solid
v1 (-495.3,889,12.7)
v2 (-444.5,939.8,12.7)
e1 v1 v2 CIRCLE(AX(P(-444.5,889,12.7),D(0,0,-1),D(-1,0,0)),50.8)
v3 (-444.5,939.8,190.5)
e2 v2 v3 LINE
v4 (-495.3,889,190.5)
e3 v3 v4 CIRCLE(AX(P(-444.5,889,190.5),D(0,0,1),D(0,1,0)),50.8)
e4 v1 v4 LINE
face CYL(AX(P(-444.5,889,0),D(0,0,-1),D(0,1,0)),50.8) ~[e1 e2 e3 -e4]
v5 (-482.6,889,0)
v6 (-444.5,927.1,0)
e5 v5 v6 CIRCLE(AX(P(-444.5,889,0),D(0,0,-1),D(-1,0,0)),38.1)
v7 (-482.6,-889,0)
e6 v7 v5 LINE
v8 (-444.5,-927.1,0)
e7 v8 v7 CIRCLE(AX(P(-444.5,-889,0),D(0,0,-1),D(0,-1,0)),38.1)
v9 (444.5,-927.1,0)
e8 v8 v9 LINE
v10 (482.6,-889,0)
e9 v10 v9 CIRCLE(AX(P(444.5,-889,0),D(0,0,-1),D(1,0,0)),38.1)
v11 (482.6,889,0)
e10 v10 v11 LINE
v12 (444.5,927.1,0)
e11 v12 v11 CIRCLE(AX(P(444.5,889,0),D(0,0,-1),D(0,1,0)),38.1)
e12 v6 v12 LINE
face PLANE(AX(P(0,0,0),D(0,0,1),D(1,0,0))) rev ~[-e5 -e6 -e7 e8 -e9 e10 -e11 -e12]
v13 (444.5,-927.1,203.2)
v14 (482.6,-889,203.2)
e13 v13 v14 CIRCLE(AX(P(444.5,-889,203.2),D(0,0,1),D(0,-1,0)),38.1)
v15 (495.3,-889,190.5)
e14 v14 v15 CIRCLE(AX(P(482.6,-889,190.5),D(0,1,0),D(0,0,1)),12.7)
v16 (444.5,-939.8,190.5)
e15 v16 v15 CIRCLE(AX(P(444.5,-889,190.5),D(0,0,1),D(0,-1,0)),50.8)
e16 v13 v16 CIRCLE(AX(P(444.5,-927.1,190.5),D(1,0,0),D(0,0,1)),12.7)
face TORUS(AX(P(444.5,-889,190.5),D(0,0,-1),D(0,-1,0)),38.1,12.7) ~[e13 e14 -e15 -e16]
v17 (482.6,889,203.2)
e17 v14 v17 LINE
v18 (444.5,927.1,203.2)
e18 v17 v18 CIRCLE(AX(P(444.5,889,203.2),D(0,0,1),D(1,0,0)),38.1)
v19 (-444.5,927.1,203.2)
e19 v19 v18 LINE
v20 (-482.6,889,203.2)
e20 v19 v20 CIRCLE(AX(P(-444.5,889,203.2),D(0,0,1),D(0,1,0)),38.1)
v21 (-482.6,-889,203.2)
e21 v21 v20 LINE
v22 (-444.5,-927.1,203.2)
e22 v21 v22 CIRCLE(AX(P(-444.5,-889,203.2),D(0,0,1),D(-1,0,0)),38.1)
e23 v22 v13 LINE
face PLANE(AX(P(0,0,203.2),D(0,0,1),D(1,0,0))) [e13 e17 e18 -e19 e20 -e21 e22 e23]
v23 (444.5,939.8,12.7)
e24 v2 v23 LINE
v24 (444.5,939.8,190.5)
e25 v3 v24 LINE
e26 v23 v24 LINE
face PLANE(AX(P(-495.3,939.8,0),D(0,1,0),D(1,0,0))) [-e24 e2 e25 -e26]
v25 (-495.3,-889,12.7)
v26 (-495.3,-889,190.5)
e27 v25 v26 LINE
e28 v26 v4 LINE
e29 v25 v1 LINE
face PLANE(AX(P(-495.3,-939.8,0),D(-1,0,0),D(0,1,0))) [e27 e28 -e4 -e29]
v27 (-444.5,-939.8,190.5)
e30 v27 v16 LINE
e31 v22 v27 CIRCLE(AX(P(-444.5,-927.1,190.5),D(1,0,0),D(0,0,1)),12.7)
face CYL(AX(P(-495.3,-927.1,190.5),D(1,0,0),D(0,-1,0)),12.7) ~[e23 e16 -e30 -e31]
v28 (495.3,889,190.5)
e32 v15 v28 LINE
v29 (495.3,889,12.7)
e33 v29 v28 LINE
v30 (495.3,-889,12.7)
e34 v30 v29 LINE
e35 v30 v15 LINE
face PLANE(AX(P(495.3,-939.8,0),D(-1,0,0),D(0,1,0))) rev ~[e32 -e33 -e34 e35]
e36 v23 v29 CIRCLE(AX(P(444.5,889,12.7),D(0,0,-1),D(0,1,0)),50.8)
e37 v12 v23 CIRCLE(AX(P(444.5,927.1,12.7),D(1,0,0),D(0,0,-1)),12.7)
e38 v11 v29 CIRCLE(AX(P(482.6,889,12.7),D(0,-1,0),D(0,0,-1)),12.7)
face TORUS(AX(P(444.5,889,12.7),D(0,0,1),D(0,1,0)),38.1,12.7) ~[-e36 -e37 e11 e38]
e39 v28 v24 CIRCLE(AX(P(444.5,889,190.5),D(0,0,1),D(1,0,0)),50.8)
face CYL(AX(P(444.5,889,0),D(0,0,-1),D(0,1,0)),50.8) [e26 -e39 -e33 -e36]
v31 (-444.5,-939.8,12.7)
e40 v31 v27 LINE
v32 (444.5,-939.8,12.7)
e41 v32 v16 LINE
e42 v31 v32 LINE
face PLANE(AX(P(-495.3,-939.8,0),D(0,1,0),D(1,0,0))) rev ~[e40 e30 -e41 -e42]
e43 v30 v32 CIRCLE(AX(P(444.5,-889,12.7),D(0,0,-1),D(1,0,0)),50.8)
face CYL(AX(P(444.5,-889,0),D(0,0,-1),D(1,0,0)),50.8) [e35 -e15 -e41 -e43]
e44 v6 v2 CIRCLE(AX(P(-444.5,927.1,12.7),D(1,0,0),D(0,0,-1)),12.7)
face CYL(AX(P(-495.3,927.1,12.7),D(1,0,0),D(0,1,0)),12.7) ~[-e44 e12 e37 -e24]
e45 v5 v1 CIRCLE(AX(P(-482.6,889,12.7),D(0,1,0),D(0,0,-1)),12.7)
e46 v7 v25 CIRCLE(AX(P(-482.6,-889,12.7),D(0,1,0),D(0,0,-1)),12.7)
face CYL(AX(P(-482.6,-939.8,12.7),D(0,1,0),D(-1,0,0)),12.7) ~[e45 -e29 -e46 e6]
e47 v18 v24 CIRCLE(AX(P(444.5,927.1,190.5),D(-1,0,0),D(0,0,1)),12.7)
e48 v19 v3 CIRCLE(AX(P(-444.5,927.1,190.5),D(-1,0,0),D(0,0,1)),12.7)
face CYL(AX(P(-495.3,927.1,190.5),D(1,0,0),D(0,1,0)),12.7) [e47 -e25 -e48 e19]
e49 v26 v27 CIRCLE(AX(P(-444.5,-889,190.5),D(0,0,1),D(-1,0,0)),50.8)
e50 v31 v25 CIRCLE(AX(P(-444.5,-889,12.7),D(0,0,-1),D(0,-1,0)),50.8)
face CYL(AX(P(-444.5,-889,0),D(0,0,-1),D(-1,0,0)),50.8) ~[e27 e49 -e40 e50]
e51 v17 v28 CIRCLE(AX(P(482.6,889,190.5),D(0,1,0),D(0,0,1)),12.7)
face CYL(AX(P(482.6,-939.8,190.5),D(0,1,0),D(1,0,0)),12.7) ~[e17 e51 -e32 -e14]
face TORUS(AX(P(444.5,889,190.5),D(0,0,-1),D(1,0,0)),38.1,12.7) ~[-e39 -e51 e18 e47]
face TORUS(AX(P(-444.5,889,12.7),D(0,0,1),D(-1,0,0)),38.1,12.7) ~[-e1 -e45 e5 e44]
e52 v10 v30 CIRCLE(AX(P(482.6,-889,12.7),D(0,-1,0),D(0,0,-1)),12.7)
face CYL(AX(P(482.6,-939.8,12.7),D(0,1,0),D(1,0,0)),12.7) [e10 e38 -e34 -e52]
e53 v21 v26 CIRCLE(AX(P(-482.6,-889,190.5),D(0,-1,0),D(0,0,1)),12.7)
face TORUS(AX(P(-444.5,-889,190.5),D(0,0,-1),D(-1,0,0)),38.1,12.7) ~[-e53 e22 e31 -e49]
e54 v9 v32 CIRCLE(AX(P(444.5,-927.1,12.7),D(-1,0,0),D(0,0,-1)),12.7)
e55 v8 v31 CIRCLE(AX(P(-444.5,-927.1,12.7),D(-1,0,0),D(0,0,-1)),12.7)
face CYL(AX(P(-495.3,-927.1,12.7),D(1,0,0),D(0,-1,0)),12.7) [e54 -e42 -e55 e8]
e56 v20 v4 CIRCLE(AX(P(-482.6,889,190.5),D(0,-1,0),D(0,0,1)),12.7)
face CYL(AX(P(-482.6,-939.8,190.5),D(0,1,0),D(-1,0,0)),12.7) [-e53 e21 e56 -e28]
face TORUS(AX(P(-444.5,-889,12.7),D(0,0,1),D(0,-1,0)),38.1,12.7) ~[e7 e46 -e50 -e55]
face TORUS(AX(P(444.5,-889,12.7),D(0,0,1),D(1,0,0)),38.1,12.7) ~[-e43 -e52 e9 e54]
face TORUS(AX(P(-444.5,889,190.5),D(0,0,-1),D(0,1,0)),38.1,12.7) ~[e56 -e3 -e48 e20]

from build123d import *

# Parameters (mm, degrees)
F0_W         = 990.6
F0_H         = 1879.6
F1_DEPTH     = 203.2
F2_R         = 12.7
F3_T1_DEPTH  = 203.2
F3_T4_ANGLE  = 90
F3_T6_ANGLE  = 90
F3_T8_ANGLE  = 90
F3_T10_ANGLE = 90
F3_T12_ANGLE = 90
F3_T14_ANGLE = 90
F3_T16_ANGLE = 90
F3_T18_ANGLE = 90


# Not quite as in the source:
# - a fillet or chamfer that OpenCascade refuses, or shapes differently, is made with other operations: its cross-section is extruded or revolved along the edge and cut away or added


with BuildPart() as f1:
    # F0 (on Top) → F1 (new body)
    with BuildSketch(Plane.XY):
        Rectangle(F0_W, F0_H)
    extrude(amount=F1_DEPTH)

    # F2
    f2_edges = [f1.edges().sort_by_distance(p)[0] for p in [
        (-495.3, 0, 203.2),
        (0, -939.8, 203.2),
        (495.3, 0, 203.2),
        (0, 939.8, 203.2),
        (495.3, 0, 0),
        (0, -939.8, 0),
        (-495.3, 0, 0),
        (0, 939.8, 0),
    ]]
    fillet(f2_edges, radius=F2_R)

    # F3: fillet of radius 50.8 on 4 edges, made by hand

    # F3_s2 → F3_t1 (cut)
    with BuildSketch(Plane.XY):
        with BuildLine():
            ThreePointArc((-495.3, -889), (-480.4210244843, -924.9210244843), (-444.5, -939.8))
            Line((-444.5, -939.8), (-444.5, -940.816))
            Line((-444.5, -940.816), (-496.316, -940.816))
            Line((-496.316, -940.816), (-496.316, -889))
            Line((-496.316, -889), (-495.3, -889))
        make_face()
        with BuildLine():
            ThreePointArc((495.3, -889), (480.4210244843, -924.9210244843), (444.5, -939.8))
            Line((444.5, -939.8), (444.5, -940.816))
            Line((444.5, -940.816), (496.316, -940.816))
            Line((496.316, -940.816), (496.316, -889))
            Line((496.316, -889), (495.3, -889))
        make_face()
        with BuildLine():
            ThreePointArc((444.5, 939.8), (480.4210244843, 924.9210244843), (495.3, 889))
            Line((495.3, 889), (496.316, 889))
            Line((496.316, 889), (496.316, 940.816))
            Line((496.316, 940.816), (444.5, 940.816))
            Line((444.5, 940.816), (444.5, 939.8))
        make_face()
        with BuildLine():
            ThreePointArc((-444.5, 939.8), (-480.4210244843, 924.9210244843), (-495.3, 889))
            Line((-495.3, 889), (-496.316, 889))
            Line((-496.316, 889), (-496.316, 940.816))
            Line((-496.316, 940.816), (-444.5, 940.816))
            Line((-444.5, 940.816), (-444.5, 939.8))
        make_face()
    extrude(amount=F3_T1_DEPTH, mode=Mode.SUBTRACT)

    # F3_s3 → F3_t4 (revolve, cut)
    with BuildSketch(Plane.XZ.offset(-889)):
        with BuildLine():
            ThreePointArc((-482.6, 0), (-491.5802561211, 3.7197438789), (-495.3, 12.7))
            Line((-495.3, 12.7), (-495.3, 0))
            Line((-495.3, 0), (-482.6, 0))
        make_face()
    revolve(axis=Axis((-444.5, 889, 0), (0, 0, -1)), revolution_arc=F3_T4_ANGLE, mode=Mode.SUBTRACT)

    # F3_s5 → F3_t6 (revolve, cut)
    with BuildSketch(Plane.YZ.offset(-444.5)):
        with BuildLine():
            ThreePointArc((927.1, 203.2), (936.0802561211, 199.4802561211), (939.8, 190.5))
            Line((939.8, 190.5), (939.8, 203.2))
            Line((939.8, 203.2), (927.1, 203.2))
        make_face()
    revolve(axis=Axis((-444.5, 889, 203.2), (0, 0, 1)), revolution_arc=F3_T6_ANGLE, mode=Mode.SUBTRACT)

    # F3_s7 → F3_t8 (revolve, cut)
    with BuildSketch(Plane.YZ.offset(444.5)):
        with BuildLine():
            ThreePointArc((927.1, 0), (936.0802561211, 3.7197438789), (939.8, 12.7))
            Line((939.8, 12.7), (939.8, 0))
            Line((939.8, 0), (927.1, 0))
        make_face()
    revolve(axis=Axis((444.5, 889, 0), (0, 0, -1)), revolution_arc=F3_T8_ANGLE, mode=Mode.SUBTRACT)

    # F3_s9 → F3_t10 (revolve, cut)
    with BuildSketch(Plane.XZ.offset(-889)):
        with BuildLine():
            ThreePointArc((482.6, 203.2), (491.5802561211, 199.4802561211), (495.3, 190.5))
            Line((495.3, 190.5), (495.3, 203.2))
            Line((495.3, 203.2), (482.6, 203.2))
        make_face()
    revolve(axis=Axis((444.5, 889, 203.2), (0, 0, 1)), revolution_arc=F3_T10_ANGLE, mode=Mode.SUBTRACT)

    # F3_s11 → F3_t12 (revolve, cut)
    with BuildSketch(Plane.XZ.offset(889)):
        with BuildLine():
            ThreePointArc((482.6, 0), (491.5802561211, 3.7197438789), (495.3, 12.7))
            Line((495.3, 12.7), (495.3, 0))
            Line((495.3, 0), (482.6, 0))
        make_face()
    revolve(axis=Axis((444.5, -889, 0), (0, 0, -1)), revolution_arc=F3_T12_ANGLE, mode=Mode.SUBTRACT)

    # F3_s13 → F3_t14 (revolve, cut)
    with BuildSketch(Plane.YZ.offset(444.5)):
        with BuildLine():
            ThreePointArc((-927.1, 203.2), (-936.0802561211, 199.4802561211), (-939.8, 190.5))
            Line((-939.8, 190.5), (-939.8, 203.2))
            Line((-939.8, 203.2), (-927.1, 203.2))
        make_face()
    revolve(axis=Axis((444.5, -889, 203.2), (0, 0, 1)), revolution_arc=F3_T14_ANGLE, mode=Mode.SUBTRACT)

    # F3_s15 → F3_t16 (revolve, cut)
    with BuildSketch(Plane.YZ.offset(-444.5)):
        with BuildLine():
            ThreePointArc((-927.1, 0), (-936.0802561211, 3.7197438789), (-939.8, 12.7))
            Line((-939.8, 12.7), (-939.8, 0))
            Line((-939.8, 0), (-927.1, 0))
        make_face()
    revolve(axis=Axis((-444.5, -889, 0), (0, 0, -1)), revolution_arc=F3_T16_ANGLE, mode=Mode.SUBTRACT)

    # F3_s17 → F3_t18 (revolve, cut)
    with BuildSketch(Plane.XZ.offset(889)):
        with BuildLine():
            ThreePointArc((-482.6, 203.2), (-491.5802561211, 199.4802561211), (-495.3, 190.5))
            Line((-495.3, 190.5), (-495.3, 203.2))
            Line((-495.3, 203.2), (-482.6, 203.2))
        make_face()
    revolve(axis=Axis((-444.5, -889, 203.2), (0, 0, 1)), revolution_arc=F3_T18_ANGLE, mode=Mode.SUBTRACT)


solid = f1.part
